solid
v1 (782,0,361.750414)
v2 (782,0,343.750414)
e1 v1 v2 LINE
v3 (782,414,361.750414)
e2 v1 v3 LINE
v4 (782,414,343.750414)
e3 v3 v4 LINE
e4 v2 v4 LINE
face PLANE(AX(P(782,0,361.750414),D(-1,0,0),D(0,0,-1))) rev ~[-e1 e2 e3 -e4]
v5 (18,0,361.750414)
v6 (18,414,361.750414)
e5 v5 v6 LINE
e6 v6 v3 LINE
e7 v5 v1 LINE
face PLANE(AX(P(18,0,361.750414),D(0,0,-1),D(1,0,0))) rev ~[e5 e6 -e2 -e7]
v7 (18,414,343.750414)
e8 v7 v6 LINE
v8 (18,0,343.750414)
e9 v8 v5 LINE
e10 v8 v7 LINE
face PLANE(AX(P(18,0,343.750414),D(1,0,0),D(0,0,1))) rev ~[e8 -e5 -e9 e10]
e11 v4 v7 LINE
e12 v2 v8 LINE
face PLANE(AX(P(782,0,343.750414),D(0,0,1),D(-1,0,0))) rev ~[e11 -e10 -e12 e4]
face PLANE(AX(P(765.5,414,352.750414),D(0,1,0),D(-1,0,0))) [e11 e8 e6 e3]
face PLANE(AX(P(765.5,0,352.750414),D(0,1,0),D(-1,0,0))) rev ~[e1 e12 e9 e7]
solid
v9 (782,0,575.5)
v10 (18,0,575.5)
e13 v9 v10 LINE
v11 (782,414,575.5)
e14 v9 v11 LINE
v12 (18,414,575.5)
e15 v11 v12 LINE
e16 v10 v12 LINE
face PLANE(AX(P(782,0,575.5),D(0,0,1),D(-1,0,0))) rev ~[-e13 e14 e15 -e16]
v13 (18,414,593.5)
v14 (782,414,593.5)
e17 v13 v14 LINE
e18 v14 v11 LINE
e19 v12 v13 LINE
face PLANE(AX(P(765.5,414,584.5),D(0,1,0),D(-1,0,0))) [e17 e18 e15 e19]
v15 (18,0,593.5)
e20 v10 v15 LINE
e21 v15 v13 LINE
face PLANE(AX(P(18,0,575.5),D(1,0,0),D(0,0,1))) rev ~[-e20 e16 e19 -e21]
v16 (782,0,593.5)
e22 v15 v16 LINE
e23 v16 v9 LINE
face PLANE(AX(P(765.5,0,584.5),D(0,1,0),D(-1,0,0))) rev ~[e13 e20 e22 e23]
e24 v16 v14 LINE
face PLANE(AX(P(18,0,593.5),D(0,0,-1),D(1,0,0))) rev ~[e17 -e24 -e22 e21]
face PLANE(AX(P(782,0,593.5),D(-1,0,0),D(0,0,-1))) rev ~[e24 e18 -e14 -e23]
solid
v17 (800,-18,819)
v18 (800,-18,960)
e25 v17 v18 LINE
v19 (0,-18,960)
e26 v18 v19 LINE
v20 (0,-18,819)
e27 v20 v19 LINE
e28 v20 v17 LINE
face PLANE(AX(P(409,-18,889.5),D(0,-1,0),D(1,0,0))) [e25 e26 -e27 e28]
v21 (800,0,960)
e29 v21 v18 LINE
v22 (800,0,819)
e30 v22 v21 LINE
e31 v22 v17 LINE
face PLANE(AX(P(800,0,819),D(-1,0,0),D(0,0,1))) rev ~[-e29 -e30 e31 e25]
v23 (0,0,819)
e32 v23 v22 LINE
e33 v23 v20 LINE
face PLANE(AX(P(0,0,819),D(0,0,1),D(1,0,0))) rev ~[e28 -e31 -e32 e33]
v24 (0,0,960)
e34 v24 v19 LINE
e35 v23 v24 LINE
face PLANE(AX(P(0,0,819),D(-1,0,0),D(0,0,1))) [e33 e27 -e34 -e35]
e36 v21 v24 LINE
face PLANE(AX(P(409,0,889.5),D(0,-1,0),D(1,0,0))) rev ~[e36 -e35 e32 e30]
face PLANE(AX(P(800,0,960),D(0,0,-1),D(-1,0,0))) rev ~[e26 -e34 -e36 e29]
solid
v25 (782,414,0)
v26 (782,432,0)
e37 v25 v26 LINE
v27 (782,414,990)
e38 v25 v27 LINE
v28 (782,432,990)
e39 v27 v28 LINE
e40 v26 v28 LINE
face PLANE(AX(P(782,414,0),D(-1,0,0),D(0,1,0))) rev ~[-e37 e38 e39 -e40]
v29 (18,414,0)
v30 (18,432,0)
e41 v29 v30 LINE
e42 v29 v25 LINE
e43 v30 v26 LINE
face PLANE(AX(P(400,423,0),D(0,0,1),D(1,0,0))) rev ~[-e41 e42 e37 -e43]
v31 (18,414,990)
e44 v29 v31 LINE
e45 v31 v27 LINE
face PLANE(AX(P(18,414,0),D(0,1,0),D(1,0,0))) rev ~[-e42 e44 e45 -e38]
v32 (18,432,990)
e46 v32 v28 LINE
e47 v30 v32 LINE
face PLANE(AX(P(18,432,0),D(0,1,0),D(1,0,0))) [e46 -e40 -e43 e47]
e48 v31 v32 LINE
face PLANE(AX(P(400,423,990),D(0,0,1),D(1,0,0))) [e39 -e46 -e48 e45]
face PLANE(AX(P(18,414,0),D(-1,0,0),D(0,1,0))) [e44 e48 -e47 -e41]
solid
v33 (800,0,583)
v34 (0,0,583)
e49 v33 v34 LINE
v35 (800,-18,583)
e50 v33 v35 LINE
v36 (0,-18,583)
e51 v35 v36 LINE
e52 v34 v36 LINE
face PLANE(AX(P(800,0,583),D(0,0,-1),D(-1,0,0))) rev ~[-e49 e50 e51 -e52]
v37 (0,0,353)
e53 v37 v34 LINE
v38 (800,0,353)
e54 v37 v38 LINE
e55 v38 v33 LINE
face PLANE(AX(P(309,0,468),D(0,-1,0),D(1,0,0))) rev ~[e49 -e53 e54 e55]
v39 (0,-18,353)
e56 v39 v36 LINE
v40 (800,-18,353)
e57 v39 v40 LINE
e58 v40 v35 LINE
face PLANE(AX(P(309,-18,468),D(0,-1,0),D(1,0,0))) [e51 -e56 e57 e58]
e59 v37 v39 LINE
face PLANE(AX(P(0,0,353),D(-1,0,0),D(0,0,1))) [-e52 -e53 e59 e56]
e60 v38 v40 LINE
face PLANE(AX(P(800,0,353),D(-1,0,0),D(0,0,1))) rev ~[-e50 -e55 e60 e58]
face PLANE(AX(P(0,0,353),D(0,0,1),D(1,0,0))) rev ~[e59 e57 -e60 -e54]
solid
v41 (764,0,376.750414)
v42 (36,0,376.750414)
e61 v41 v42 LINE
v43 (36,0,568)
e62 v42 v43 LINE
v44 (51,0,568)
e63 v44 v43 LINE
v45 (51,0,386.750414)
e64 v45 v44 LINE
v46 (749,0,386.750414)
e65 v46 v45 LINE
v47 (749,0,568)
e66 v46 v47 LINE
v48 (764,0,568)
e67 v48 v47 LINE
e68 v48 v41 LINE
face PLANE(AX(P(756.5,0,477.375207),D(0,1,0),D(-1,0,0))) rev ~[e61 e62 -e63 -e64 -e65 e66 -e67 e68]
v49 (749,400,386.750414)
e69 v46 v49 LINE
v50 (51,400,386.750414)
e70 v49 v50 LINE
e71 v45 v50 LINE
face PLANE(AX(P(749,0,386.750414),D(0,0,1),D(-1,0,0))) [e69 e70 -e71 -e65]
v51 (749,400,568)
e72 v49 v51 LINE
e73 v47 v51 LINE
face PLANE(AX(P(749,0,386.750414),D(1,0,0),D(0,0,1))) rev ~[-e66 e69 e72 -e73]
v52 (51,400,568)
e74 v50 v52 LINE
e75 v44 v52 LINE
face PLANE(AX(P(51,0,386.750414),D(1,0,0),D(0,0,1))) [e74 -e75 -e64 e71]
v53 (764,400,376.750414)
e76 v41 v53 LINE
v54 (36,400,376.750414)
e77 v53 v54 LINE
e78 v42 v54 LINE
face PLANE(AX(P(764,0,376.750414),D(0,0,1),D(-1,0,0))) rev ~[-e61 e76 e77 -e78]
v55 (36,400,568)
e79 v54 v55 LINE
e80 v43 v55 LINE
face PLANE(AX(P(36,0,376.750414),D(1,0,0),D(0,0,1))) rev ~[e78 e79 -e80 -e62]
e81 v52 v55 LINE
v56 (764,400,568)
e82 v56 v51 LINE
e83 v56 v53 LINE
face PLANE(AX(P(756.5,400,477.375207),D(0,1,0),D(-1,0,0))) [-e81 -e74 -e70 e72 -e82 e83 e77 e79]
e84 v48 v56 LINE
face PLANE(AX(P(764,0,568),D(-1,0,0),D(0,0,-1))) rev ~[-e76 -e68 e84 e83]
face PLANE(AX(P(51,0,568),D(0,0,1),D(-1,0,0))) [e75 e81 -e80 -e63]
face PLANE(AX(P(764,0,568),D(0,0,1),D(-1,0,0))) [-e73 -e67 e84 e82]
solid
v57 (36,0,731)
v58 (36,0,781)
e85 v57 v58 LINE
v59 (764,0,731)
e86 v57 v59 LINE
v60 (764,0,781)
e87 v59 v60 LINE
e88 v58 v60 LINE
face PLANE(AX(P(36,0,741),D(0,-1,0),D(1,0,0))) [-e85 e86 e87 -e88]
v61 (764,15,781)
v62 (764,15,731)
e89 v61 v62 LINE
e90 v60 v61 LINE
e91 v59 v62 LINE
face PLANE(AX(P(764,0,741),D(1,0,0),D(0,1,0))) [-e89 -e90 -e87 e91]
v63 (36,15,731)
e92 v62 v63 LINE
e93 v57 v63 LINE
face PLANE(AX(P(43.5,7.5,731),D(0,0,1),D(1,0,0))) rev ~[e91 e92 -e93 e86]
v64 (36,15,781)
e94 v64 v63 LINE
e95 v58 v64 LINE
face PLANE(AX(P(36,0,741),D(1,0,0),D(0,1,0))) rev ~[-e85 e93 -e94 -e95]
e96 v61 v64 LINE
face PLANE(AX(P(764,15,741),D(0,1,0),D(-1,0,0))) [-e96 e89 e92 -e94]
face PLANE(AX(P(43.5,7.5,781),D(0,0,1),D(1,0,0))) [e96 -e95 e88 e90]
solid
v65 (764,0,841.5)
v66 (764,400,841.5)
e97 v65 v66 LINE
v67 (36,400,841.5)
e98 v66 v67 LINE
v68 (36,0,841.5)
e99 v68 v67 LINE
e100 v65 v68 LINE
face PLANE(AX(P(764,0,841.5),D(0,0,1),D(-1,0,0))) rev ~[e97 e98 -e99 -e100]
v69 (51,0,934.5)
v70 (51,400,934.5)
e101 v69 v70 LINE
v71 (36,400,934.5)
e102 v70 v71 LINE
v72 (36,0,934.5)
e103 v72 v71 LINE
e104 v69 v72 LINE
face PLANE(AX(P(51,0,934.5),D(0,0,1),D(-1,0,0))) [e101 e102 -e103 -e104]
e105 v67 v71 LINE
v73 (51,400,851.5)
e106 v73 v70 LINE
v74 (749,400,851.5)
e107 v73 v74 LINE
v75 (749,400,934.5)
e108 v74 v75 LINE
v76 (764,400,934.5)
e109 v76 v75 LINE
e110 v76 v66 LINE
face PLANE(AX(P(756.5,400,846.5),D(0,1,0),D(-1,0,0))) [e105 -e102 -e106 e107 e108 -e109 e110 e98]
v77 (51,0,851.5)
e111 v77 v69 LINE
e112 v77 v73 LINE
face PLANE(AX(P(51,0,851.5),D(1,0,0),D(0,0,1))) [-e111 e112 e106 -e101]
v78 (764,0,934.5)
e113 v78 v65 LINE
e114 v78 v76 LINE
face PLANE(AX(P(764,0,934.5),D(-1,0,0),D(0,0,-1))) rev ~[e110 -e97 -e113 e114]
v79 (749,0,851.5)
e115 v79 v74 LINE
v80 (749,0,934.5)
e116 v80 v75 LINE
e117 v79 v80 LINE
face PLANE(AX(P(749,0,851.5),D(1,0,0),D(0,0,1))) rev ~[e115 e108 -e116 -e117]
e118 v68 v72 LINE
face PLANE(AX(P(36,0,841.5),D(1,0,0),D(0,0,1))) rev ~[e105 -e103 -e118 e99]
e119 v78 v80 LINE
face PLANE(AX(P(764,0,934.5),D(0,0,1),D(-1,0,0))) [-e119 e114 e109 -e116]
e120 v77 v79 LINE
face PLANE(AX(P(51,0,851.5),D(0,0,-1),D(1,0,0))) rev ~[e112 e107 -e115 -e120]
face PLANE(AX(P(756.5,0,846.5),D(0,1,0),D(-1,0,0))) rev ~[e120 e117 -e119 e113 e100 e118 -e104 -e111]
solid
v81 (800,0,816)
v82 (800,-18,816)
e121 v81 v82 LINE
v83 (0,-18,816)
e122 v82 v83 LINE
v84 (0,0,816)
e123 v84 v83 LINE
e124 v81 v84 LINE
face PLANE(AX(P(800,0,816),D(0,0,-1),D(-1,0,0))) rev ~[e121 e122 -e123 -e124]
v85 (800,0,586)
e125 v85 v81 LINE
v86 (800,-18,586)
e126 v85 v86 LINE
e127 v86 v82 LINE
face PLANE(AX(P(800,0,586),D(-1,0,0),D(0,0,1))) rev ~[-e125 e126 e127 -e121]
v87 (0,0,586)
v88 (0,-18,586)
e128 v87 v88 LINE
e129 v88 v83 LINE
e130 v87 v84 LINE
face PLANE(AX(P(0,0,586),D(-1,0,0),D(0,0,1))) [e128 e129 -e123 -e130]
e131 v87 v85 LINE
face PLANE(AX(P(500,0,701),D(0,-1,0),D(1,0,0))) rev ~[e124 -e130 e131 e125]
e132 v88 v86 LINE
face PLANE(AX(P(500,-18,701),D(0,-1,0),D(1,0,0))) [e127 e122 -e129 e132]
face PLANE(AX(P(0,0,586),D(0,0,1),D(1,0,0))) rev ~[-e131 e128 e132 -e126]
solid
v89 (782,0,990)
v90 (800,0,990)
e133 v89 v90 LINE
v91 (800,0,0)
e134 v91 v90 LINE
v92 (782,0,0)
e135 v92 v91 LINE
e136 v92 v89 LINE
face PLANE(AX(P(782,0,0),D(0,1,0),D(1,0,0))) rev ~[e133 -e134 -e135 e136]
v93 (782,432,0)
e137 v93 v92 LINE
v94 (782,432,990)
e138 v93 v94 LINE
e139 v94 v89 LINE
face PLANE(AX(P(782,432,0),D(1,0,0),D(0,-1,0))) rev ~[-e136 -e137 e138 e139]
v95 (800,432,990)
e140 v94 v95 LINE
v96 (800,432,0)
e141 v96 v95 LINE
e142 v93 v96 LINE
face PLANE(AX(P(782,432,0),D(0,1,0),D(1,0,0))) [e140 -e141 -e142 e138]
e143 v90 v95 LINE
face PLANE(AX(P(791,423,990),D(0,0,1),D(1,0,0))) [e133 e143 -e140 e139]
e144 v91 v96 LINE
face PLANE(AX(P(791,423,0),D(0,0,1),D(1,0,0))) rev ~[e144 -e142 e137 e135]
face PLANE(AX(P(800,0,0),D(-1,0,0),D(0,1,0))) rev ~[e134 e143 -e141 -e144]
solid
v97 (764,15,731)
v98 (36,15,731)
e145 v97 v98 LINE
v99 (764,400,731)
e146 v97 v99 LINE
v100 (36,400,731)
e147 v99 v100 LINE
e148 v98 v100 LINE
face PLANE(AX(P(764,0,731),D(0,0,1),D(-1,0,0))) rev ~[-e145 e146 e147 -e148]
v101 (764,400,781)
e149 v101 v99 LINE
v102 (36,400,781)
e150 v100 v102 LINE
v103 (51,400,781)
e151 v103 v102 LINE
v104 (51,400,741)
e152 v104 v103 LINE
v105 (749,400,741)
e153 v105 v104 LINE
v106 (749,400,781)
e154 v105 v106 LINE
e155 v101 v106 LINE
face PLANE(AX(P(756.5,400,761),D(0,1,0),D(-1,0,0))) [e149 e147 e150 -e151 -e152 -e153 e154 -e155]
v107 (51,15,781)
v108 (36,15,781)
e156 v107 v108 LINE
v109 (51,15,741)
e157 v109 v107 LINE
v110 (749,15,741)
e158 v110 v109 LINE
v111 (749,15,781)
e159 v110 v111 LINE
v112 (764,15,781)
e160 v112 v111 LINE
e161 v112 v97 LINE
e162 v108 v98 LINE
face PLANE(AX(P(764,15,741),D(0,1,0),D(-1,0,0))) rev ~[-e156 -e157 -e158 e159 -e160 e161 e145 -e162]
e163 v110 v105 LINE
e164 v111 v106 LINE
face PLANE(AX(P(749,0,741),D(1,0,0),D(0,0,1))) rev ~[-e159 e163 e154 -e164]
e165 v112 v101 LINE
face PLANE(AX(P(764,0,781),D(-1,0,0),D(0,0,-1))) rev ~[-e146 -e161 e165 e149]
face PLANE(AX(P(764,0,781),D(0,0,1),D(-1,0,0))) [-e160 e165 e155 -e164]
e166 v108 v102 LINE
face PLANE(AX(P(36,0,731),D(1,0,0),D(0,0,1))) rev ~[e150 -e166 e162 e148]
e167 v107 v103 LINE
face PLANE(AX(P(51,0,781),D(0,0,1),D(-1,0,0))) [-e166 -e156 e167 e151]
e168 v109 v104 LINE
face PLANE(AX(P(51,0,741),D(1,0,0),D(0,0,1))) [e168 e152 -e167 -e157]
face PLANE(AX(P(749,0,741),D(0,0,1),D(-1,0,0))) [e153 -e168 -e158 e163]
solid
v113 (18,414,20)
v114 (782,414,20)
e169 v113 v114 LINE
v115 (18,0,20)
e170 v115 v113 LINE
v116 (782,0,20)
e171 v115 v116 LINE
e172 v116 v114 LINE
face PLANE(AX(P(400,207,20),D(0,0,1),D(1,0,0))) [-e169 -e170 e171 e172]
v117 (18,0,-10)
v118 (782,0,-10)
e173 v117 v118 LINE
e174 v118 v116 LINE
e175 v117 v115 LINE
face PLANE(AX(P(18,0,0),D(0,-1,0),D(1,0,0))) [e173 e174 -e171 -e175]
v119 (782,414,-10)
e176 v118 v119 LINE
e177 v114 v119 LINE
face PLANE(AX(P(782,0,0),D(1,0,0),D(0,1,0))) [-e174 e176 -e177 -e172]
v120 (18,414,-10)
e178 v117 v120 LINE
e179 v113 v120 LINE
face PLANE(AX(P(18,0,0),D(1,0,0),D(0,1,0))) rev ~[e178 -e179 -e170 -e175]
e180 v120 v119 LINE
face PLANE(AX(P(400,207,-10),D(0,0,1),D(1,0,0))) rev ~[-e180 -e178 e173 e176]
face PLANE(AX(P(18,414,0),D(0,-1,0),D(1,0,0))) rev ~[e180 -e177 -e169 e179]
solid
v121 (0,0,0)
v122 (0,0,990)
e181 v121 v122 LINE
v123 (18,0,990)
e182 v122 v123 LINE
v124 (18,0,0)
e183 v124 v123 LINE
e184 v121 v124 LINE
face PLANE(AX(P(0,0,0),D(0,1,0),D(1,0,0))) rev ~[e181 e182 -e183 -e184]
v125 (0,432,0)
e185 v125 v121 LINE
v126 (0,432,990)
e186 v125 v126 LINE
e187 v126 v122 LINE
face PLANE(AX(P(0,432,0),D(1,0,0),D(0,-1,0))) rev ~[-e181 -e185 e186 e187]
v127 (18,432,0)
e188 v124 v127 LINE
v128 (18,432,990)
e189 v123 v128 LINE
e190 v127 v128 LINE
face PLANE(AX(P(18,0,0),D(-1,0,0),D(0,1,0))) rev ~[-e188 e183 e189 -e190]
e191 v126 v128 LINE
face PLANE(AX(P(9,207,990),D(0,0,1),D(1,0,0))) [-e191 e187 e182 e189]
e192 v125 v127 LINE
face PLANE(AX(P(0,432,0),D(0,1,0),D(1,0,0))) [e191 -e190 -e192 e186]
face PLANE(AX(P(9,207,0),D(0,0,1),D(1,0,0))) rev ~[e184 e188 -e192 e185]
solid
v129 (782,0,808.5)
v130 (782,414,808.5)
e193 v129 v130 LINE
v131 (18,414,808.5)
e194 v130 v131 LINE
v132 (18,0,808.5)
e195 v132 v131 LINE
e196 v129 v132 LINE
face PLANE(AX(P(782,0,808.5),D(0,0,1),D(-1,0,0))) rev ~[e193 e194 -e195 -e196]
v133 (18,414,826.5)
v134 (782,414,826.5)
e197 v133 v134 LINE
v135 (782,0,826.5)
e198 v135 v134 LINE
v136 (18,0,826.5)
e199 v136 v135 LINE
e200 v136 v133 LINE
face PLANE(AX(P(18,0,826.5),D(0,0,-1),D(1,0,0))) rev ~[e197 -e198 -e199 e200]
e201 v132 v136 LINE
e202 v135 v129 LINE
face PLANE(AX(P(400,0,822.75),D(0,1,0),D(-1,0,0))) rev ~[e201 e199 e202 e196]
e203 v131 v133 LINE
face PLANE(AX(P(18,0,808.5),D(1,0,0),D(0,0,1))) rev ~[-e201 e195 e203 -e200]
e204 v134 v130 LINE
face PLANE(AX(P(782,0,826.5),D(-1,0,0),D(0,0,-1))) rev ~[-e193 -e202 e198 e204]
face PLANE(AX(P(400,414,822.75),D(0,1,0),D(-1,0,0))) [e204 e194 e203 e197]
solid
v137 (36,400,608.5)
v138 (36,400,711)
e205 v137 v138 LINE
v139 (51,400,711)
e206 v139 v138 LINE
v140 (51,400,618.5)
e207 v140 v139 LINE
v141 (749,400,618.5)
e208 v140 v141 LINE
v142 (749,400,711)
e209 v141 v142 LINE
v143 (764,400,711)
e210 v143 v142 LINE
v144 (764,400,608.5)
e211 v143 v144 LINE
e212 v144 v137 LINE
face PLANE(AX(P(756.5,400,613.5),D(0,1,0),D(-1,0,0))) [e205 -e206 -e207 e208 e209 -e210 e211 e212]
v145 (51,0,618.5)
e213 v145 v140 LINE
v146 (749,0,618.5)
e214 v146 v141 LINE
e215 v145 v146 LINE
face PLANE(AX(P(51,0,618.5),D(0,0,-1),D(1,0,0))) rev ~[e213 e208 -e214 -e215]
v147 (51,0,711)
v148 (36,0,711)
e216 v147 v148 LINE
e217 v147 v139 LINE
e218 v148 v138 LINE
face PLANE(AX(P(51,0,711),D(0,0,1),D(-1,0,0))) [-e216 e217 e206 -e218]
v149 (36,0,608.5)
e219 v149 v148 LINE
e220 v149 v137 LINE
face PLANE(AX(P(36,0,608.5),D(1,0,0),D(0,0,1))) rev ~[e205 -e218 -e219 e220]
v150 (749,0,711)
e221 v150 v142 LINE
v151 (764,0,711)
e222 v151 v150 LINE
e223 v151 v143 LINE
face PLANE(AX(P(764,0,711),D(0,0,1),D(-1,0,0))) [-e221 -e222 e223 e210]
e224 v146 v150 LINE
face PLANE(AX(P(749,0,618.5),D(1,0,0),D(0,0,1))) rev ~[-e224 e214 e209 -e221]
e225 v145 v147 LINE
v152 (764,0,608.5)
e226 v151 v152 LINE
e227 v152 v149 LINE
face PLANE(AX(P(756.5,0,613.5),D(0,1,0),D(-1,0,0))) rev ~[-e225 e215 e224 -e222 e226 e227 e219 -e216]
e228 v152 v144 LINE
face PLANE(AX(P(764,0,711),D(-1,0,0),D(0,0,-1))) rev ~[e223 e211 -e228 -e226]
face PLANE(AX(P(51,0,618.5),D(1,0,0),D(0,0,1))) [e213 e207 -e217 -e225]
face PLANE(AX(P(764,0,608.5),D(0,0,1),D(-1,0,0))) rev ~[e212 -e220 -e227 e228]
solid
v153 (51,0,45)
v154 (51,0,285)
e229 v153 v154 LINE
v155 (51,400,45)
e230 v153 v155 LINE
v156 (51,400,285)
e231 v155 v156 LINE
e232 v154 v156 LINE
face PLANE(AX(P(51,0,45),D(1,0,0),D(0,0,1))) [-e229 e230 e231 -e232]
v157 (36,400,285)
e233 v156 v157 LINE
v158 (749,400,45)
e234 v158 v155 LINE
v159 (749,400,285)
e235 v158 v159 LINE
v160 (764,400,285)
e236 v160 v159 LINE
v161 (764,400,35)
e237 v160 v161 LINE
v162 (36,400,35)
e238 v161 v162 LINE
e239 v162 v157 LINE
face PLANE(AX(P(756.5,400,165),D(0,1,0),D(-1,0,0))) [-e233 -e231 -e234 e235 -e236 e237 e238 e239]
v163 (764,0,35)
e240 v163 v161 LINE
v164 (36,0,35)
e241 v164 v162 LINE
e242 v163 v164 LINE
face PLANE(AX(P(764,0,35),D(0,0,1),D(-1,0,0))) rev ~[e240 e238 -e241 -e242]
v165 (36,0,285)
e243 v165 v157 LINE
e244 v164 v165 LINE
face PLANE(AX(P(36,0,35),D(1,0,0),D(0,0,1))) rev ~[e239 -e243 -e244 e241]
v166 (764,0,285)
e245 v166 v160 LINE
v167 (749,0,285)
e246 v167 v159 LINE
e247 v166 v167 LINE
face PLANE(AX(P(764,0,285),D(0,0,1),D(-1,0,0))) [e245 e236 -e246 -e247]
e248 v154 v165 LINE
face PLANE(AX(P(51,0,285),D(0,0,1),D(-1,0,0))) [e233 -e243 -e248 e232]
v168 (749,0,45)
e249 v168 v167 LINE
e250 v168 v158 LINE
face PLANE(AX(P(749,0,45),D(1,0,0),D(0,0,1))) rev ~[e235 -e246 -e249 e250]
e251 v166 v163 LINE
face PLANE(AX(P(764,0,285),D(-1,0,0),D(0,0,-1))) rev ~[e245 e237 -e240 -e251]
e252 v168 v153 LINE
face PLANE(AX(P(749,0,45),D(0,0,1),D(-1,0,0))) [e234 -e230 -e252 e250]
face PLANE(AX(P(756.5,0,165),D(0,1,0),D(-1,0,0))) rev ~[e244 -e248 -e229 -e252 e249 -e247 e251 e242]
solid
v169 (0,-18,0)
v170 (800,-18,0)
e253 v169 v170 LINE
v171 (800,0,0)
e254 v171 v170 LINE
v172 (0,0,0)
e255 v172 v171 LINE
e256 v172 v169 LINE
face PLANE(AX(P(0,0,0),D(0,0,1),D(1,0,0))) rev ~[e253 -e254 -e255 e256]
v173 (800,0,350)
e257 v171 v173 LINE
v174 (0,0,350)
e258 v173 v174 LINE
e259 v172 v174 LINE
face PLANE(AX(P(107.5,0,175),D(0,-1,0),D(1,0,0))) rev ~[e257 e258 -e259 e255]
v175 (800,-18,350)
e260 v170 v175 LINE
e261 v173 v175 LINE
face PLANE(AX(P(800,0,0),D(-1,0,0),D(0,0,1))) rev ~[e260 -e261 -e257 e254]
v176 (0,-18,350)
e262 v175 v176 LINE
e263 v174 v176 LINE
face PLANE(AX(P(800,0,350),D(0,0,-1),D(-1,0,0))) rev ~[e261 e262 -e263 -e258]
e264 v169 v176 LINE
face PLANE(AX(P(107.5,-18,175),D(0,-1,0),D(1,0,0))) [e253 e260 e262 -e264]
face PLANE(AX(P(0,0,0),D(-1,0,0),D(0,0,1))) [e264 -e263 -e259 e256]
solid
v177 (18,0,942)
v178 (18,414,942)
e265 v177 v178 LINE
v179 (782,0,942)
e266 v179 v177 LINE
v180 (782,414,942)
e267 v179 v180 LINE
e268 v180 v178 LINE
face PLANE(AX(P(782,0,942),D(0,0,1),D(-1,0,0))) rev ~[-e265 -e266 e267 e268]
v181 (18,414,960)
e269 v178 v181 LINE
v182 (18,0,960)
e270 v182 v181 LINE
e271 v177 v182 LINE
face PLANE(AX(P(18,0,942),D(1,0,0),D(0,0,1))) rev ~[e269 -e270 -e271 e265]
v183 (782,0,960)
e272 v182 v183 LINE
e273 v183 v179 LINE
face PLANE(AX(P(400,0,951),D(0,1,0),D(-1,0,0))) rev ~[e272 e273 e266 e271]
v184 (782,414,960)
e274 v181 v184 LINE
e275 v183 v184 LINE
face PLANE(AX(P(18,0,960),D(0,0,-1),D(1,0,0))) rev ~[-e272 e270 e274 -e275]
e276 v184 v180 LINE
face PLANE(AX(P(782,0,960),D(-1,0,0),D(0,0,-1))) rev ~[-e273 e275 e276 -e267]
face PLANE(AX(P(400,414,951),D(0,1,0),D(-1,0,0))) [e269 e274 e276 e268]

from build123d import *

# Parameters (mm, degrees)
F0_W           = 18
F0_H           = 414
F0_H_2         = 18
F1_DEPTH       = 990
F0_W_2         = 764
F2_DEPTH       = 990
F3_DEPTH       = 20
F3_DEPTH_BACK  = 10
F4_W           = 782
F4_H           = 141
F4_W_2         = 18
F5_DEPTH       = 18
F4_W_3         = 600
F4_H_2         = 230
F4_W_4         = 3
F4_W_5         = 179
F4_W_6         = 582
F4_W_7         = 197
F4_H_3         = 350
F7_DEPTH       = 414
F6_W           = 698
F6_H           = 18
F6_W_2         = 15
F6_H_2         = 10
F6_H_3         = 83
F8_DEPTH       = 400
F6_H_4         = 40
F6_H_5         = 92.5
F6_H_6         = 181.2495863438
F6_H_7         = 240
F9_W           = 15
F9_H           = 15
F9_W_2         = 698
F10_DEPTH      = 40
F10_DEPTH_BACK = 10


# Not quite as in the source:
# - a feature names something its author has since deleted; it is built from what else it names


with BuildPart() as f1:
    # F0 (on Top) → F1 (new body)
    with BuildSketch(Plane.XY):
        with Locations((9, 207)):
            Rectangle(F0_W, F0_H)
        with Locations((9, 423)):
            Rectangle(F0_W, F0_H_2)
    extrude(amount=F1_DEPTH)


with BuildPart() as f1b:
    # F0 (on Top) → F1, piece 2 (new body)
    with BuildSketch(Plane.XY):
        with Locations((791, 423)):
            Rectangle(F0_W, F0_H_2)
        with Locations((791, 207)):
            Rectangle(F0_W, F0_H)
    extrude(amount=F1_DEPTH)


with BuildPart() as f2:
    # F0 (on Top) → F2 (new body, through all)
    with BuildSketch(Plane.XY):
        with Locations((400, 423)):
            Rectangle(F0_W_2, F0_H_2)
    extrude(amount=F2_DEPTH)


with BuildPart() as f3:
    # F0 (on Top) → F3 (new body, two sides)
    with BuildSketch(Plane.XY) as f3_sk:
        with Locations((400, 207)):
            Rectangle(F0_W_2, F0_H)
    extrude(amount=F3_DEPTH)
    extrude(f3_sk.sketch, amount=-F3_DEPTH_BACK)


with BuildPart() as f5:
    # F4 (on face) → F5 (new body)
    with BuildSketch(Plane.XZ):
        with Locations((409, 889.5)):
            Rectangle(F4_W, F4_H)
        with Locations((9, 889.5)):
            Rectangle(F4_W_2, F4_H)
    extrude(amount=F5_DEPTH)


with BuildPart() as f5b:
    # F4 (on face) → F5, piece 2 (new body)
    with BuildSketch(Plane.XZ):
        with Locations((500, 701)):
            Rectangle(F4_W_3, F4_H_2)
        with Locations((198.5, 701)):
            Rectangle(F4_W_4, F4_H_2)
        with Locations((107.5, 701)):
            Rectangle(F4_W_5, F4_H_2)
        with Locations((9, 701)):
            Rectangle(F4_W_2, F4_H_2)
    extrude(amount=F5_DEPTH)


with BuildPart() as f5c:
    # F4 (on face) → F5, piece 3 (new body)
    with BuildSketch(Plane.XZ):
        with Locations((309, 468)):
            Rectangle(F4_W_6, F4_H_2)
        with Locations((9, 468)):
            Rectangle(F4_W_2, F4_H_2)
        with Locations((601.5, 468)):
            Rectangle(F4_W_4, F4_H_2)
        with Locations((701.5, 468)):
            Rectangle(F4_W_7, F4_H_2)
    extrude(amount=F5_DEPTH)


with BuildPart() as f5d:
    # F4 (on face) → F5, piece 4 (new body)
    with BuildSketch(Plane.XZ):
        with Locations((107.5, 175)):
            Rectangle(F4_W_5, F4_H_3)
        with Locations((9, 175)):
            Rectangle(F4_W_2, F4_H_3)
        with Locations((500, 175)):
            Rectangle(F4_W_3, F4_H_3)
        with Locations((198.5, 175)):
            Rectangle(F4_W_4, F4_H_3)
    extrude(amount=F5_DEPTH)


with BuildPart() as f7:
    # F6 (on face) → F7 (new body, through all)
    with BuildSketch(Plane(origin=(0, 0, 0), x_dir=(-1, 0, 0), z_dir=(0, 1, 0))):
        Polygon((-782, 960), (-782, 942), (-764, 942), (-749, 942), (-36, 942), (-18, 942), (-18, 960), align=None)
    extrude(amount=F7_DEPTH)


with BuildPart() as f7b:
    # F6 (on face) → F7, piece 2 (new body, through all)
    with BuildSketch(Plane(origin=(0, 0, 0), x_dir=(-1, 0, 0), z_dir=(0, 1, 0))):
        Polygon((-764, 826.5), (-782, 826.5), (-782, 819), (-18, 819), (-18, 826.5), (-36, 826.5), align=None)
        Polygon((-18, 819), (-782, 819), (-782, 808.5), (-764, 808.5), (-749, 808.5), (-51, 808.5), (-36, 808.5), (-18, 808.5), align=None)
    extrude(amount=F7_DEPTH)


with BuildPart() as f7c:
    # F6 (on face) → F7, piece 3 (new body, through all)
    with BuildSketch(Plane(origin=(0, 0, 0), x_dir=(-1, 0, 0), z_dir=(0, 1, 0))):
        Polygon((-764, 593.5), (-782, 593.5), (-782, 575.5), (-764, 575.5), (-749, 575.5), (-749, 593.5), align=None)
        with Locations((-400, 584.5)):
            Rectangle(F6_W, F6_H)
        Polygon((-36, 593.5), (-51, 593.5), (-51, 575.5), (-36, 575.5), (-18, 575.5), (-18, 593.5), align=None)
    extrude(amount=F7_DEPTH)


with BuildPart() as f7d:
    # F6 (on face) → F7, piece 4 (new body, through all)
    with BuildSketch(Plane(origin=(0, 0, 0), x_dir=(-1, 0, 0), z_dir=(0, 1, 0))):
        Polygon((-764, 361.7504136562), (-782, 361.7504136562), (-782, 343.7504136562), (-764, 343.7504136562), (-749, 343.7504136562), (-749, 361.7504136562), align=None)
        with Locations((-400, 352.7504136562)):
            Rectangle(F6_W, F6_H)
        Polygon((-36, 361.7504136562), (-51, 361.7504136562), (-51, 343.7504136562), (-36, 343.7504136562), (-18, 343.7504136562), (-18, 361.7504136562), align=None)
    extrude(amount=F7_DEPTH)


with BuildPart() as f8:
    # F6 (on face) → F8 (new body)
    with BuildSketch(Plane(origin=(0, 0, 0), x_dir=(-1, 0, 0), z_dir=(0, 1, 0))):
        with Locations((-756.5, 846.5)):
            Rectangle(F6_W_2, F6_H_2)
        with Locations((-43.5, 846.5)):
            Rectangle(F6_W_2, F6_H_2)
        with Locations((-756.5, 893)):
            Rectangle(F6_W_2, F6_H_3)
        with Locations((-400, 846.5)):
            Rectangle(F6_W, F6_H_2)
        with Locations((-43.5, 893)):
            Rectangle(F6_W_2, F6_H_3)
    extrude(amount=F8_DEPTH)


with BuildPart() as f8b:
    # F6 (on face) → F8, piece 2 (new body)
    with BuildSketch(Plane(origin=(0, 0, 0), x_dir=(-1, 0, 0), z_dir=(0, 1, 0))):
        with Locations((-756.5, 761)):
            Rectangle(F6_W_2, F6_H_4)
        with Locations((-756.5, 736)):
            Rectangle(F6_W_2, F6_H_2)
        with Locations((-43.5, 761)):
            Rectangle(F6_W_2, F6_H_4)
        with Locations((-400, 736)):
            Rectangle(F6_W, F6_H_2)
        with Locations((-43.5, 736)):
            Rectangle(F6_W_2, F6_H_2)
    extrude(amount=F8_DEPTH)


with BuildPart() as f8c:
    # F6 (on face) → F8, piece 3 (new body)
    with BuildSketch(Plane(origin=(0, 0, 0), x_dir=(-1, 0, 0), z_dir=(0, 1, 0))):
        with Locations((-756.5, 613.5)):
            Rectangle(F6_W_2, F6_H_2)
        with Locations((-756.5, 664.75)):
            Rectangle(F6_W_2, F6_H_5)
        with Locations((-400, 613.5)):
            Rectangle(F6_W, F6_H_2)
        with Locations((-43.5, 613.5)):
            Rectangle(F6_W_2, F6_H_2)
        with Locations((-43.5, 664.75)):
            Rectangle(F6_W_2, F6_H_5)
    extrude(amount=F8_DEPTH)


with BuildPart() as f8d:
    # F6 (on face) → F8, piece 4 (new body)
    with BuildSketch(Plane(origin=(0, 0, 0), x_dir=(-1, 0, 0), z_dir=(0, 1, 0))):
        with Locations((-756.5, 477.3752068281)):
            Rectangle(F6_W_2, F6_H_6)
        with Locations((-756.5, 381.7504136562)):
            Rectangle(F6_W_2, F6_H_2)
        with Locations((-43.5, 477.3752068281)):
            Rectangle(F6_W_2, F6_H_6)
        with Locations((-400, 381.7504136562)):
            Rectangle(F6_W, F6_H_2)
        with Locations((-43.5, 381.7504136562)):
            Rectangle(F6_W_2, F6_H_2)
    extrude(amount=F8_DEPTH)


with BuildPart() as f8e:
    # F6 (on face) → F8, piece 5 (new body)
    with BuildSketch(Plane(origin=(0, 0, 0), x_dir=(-1, 0, 0), z_dir=(0, 1, 0))):
        with Locations((-756.5, 165)):
            Rectangle(F6_W_2, F6_H_7)
        with Locations((-756.5, 40)):
            Rectangle(F6_W_2, F6_H_2)
        with Locations((-400, 40)):
            Rectangle(F6_W, F6_H_2)
        with Locations((-43.5, 165)):
            Rectangle(F6_W_2, F6_H_7)
        with Locations((-43.5, 40)):
            Rectangle(F6_W_2, F6_H_2)
    extrude(amount=F8_DEPTH)


with BuildPart() as f10:
    # F9 (on face) → F10 (new body, two sides)
    with BuildSketch(Plane.XY.offset(741)) as f10_sk:
        with Locations((43.5, 7.5)):
            Rectangle(F9_W, F9_H)
        with Locations((400, 7.5)):
            Rectangle(F9_W_2, F9_H)
        with Locations((756.5, 7.5)):
            Rectangle(F9_W, F9_H)
    extrude(amount=F10_DEPTH)
    extrude(f10_sk.sketch, amount=-F10_DEPTH_BACK)


with BuildPart() as f8b_1:
    add(f8b.part)

    # F11: cut F10
    add(f10.part, mode=Mode.SUBTRACT)


solid = Compound([f1.part, f1b.part, f2.part, f3.part, f5.part, f5b.part, f5c.part, f5d.part, f7.part, f7b.part, f7c.part, f7d.part, f8.part, f8c.part, f8d.part, f8e.part, f10.part, f8b_1.part])
